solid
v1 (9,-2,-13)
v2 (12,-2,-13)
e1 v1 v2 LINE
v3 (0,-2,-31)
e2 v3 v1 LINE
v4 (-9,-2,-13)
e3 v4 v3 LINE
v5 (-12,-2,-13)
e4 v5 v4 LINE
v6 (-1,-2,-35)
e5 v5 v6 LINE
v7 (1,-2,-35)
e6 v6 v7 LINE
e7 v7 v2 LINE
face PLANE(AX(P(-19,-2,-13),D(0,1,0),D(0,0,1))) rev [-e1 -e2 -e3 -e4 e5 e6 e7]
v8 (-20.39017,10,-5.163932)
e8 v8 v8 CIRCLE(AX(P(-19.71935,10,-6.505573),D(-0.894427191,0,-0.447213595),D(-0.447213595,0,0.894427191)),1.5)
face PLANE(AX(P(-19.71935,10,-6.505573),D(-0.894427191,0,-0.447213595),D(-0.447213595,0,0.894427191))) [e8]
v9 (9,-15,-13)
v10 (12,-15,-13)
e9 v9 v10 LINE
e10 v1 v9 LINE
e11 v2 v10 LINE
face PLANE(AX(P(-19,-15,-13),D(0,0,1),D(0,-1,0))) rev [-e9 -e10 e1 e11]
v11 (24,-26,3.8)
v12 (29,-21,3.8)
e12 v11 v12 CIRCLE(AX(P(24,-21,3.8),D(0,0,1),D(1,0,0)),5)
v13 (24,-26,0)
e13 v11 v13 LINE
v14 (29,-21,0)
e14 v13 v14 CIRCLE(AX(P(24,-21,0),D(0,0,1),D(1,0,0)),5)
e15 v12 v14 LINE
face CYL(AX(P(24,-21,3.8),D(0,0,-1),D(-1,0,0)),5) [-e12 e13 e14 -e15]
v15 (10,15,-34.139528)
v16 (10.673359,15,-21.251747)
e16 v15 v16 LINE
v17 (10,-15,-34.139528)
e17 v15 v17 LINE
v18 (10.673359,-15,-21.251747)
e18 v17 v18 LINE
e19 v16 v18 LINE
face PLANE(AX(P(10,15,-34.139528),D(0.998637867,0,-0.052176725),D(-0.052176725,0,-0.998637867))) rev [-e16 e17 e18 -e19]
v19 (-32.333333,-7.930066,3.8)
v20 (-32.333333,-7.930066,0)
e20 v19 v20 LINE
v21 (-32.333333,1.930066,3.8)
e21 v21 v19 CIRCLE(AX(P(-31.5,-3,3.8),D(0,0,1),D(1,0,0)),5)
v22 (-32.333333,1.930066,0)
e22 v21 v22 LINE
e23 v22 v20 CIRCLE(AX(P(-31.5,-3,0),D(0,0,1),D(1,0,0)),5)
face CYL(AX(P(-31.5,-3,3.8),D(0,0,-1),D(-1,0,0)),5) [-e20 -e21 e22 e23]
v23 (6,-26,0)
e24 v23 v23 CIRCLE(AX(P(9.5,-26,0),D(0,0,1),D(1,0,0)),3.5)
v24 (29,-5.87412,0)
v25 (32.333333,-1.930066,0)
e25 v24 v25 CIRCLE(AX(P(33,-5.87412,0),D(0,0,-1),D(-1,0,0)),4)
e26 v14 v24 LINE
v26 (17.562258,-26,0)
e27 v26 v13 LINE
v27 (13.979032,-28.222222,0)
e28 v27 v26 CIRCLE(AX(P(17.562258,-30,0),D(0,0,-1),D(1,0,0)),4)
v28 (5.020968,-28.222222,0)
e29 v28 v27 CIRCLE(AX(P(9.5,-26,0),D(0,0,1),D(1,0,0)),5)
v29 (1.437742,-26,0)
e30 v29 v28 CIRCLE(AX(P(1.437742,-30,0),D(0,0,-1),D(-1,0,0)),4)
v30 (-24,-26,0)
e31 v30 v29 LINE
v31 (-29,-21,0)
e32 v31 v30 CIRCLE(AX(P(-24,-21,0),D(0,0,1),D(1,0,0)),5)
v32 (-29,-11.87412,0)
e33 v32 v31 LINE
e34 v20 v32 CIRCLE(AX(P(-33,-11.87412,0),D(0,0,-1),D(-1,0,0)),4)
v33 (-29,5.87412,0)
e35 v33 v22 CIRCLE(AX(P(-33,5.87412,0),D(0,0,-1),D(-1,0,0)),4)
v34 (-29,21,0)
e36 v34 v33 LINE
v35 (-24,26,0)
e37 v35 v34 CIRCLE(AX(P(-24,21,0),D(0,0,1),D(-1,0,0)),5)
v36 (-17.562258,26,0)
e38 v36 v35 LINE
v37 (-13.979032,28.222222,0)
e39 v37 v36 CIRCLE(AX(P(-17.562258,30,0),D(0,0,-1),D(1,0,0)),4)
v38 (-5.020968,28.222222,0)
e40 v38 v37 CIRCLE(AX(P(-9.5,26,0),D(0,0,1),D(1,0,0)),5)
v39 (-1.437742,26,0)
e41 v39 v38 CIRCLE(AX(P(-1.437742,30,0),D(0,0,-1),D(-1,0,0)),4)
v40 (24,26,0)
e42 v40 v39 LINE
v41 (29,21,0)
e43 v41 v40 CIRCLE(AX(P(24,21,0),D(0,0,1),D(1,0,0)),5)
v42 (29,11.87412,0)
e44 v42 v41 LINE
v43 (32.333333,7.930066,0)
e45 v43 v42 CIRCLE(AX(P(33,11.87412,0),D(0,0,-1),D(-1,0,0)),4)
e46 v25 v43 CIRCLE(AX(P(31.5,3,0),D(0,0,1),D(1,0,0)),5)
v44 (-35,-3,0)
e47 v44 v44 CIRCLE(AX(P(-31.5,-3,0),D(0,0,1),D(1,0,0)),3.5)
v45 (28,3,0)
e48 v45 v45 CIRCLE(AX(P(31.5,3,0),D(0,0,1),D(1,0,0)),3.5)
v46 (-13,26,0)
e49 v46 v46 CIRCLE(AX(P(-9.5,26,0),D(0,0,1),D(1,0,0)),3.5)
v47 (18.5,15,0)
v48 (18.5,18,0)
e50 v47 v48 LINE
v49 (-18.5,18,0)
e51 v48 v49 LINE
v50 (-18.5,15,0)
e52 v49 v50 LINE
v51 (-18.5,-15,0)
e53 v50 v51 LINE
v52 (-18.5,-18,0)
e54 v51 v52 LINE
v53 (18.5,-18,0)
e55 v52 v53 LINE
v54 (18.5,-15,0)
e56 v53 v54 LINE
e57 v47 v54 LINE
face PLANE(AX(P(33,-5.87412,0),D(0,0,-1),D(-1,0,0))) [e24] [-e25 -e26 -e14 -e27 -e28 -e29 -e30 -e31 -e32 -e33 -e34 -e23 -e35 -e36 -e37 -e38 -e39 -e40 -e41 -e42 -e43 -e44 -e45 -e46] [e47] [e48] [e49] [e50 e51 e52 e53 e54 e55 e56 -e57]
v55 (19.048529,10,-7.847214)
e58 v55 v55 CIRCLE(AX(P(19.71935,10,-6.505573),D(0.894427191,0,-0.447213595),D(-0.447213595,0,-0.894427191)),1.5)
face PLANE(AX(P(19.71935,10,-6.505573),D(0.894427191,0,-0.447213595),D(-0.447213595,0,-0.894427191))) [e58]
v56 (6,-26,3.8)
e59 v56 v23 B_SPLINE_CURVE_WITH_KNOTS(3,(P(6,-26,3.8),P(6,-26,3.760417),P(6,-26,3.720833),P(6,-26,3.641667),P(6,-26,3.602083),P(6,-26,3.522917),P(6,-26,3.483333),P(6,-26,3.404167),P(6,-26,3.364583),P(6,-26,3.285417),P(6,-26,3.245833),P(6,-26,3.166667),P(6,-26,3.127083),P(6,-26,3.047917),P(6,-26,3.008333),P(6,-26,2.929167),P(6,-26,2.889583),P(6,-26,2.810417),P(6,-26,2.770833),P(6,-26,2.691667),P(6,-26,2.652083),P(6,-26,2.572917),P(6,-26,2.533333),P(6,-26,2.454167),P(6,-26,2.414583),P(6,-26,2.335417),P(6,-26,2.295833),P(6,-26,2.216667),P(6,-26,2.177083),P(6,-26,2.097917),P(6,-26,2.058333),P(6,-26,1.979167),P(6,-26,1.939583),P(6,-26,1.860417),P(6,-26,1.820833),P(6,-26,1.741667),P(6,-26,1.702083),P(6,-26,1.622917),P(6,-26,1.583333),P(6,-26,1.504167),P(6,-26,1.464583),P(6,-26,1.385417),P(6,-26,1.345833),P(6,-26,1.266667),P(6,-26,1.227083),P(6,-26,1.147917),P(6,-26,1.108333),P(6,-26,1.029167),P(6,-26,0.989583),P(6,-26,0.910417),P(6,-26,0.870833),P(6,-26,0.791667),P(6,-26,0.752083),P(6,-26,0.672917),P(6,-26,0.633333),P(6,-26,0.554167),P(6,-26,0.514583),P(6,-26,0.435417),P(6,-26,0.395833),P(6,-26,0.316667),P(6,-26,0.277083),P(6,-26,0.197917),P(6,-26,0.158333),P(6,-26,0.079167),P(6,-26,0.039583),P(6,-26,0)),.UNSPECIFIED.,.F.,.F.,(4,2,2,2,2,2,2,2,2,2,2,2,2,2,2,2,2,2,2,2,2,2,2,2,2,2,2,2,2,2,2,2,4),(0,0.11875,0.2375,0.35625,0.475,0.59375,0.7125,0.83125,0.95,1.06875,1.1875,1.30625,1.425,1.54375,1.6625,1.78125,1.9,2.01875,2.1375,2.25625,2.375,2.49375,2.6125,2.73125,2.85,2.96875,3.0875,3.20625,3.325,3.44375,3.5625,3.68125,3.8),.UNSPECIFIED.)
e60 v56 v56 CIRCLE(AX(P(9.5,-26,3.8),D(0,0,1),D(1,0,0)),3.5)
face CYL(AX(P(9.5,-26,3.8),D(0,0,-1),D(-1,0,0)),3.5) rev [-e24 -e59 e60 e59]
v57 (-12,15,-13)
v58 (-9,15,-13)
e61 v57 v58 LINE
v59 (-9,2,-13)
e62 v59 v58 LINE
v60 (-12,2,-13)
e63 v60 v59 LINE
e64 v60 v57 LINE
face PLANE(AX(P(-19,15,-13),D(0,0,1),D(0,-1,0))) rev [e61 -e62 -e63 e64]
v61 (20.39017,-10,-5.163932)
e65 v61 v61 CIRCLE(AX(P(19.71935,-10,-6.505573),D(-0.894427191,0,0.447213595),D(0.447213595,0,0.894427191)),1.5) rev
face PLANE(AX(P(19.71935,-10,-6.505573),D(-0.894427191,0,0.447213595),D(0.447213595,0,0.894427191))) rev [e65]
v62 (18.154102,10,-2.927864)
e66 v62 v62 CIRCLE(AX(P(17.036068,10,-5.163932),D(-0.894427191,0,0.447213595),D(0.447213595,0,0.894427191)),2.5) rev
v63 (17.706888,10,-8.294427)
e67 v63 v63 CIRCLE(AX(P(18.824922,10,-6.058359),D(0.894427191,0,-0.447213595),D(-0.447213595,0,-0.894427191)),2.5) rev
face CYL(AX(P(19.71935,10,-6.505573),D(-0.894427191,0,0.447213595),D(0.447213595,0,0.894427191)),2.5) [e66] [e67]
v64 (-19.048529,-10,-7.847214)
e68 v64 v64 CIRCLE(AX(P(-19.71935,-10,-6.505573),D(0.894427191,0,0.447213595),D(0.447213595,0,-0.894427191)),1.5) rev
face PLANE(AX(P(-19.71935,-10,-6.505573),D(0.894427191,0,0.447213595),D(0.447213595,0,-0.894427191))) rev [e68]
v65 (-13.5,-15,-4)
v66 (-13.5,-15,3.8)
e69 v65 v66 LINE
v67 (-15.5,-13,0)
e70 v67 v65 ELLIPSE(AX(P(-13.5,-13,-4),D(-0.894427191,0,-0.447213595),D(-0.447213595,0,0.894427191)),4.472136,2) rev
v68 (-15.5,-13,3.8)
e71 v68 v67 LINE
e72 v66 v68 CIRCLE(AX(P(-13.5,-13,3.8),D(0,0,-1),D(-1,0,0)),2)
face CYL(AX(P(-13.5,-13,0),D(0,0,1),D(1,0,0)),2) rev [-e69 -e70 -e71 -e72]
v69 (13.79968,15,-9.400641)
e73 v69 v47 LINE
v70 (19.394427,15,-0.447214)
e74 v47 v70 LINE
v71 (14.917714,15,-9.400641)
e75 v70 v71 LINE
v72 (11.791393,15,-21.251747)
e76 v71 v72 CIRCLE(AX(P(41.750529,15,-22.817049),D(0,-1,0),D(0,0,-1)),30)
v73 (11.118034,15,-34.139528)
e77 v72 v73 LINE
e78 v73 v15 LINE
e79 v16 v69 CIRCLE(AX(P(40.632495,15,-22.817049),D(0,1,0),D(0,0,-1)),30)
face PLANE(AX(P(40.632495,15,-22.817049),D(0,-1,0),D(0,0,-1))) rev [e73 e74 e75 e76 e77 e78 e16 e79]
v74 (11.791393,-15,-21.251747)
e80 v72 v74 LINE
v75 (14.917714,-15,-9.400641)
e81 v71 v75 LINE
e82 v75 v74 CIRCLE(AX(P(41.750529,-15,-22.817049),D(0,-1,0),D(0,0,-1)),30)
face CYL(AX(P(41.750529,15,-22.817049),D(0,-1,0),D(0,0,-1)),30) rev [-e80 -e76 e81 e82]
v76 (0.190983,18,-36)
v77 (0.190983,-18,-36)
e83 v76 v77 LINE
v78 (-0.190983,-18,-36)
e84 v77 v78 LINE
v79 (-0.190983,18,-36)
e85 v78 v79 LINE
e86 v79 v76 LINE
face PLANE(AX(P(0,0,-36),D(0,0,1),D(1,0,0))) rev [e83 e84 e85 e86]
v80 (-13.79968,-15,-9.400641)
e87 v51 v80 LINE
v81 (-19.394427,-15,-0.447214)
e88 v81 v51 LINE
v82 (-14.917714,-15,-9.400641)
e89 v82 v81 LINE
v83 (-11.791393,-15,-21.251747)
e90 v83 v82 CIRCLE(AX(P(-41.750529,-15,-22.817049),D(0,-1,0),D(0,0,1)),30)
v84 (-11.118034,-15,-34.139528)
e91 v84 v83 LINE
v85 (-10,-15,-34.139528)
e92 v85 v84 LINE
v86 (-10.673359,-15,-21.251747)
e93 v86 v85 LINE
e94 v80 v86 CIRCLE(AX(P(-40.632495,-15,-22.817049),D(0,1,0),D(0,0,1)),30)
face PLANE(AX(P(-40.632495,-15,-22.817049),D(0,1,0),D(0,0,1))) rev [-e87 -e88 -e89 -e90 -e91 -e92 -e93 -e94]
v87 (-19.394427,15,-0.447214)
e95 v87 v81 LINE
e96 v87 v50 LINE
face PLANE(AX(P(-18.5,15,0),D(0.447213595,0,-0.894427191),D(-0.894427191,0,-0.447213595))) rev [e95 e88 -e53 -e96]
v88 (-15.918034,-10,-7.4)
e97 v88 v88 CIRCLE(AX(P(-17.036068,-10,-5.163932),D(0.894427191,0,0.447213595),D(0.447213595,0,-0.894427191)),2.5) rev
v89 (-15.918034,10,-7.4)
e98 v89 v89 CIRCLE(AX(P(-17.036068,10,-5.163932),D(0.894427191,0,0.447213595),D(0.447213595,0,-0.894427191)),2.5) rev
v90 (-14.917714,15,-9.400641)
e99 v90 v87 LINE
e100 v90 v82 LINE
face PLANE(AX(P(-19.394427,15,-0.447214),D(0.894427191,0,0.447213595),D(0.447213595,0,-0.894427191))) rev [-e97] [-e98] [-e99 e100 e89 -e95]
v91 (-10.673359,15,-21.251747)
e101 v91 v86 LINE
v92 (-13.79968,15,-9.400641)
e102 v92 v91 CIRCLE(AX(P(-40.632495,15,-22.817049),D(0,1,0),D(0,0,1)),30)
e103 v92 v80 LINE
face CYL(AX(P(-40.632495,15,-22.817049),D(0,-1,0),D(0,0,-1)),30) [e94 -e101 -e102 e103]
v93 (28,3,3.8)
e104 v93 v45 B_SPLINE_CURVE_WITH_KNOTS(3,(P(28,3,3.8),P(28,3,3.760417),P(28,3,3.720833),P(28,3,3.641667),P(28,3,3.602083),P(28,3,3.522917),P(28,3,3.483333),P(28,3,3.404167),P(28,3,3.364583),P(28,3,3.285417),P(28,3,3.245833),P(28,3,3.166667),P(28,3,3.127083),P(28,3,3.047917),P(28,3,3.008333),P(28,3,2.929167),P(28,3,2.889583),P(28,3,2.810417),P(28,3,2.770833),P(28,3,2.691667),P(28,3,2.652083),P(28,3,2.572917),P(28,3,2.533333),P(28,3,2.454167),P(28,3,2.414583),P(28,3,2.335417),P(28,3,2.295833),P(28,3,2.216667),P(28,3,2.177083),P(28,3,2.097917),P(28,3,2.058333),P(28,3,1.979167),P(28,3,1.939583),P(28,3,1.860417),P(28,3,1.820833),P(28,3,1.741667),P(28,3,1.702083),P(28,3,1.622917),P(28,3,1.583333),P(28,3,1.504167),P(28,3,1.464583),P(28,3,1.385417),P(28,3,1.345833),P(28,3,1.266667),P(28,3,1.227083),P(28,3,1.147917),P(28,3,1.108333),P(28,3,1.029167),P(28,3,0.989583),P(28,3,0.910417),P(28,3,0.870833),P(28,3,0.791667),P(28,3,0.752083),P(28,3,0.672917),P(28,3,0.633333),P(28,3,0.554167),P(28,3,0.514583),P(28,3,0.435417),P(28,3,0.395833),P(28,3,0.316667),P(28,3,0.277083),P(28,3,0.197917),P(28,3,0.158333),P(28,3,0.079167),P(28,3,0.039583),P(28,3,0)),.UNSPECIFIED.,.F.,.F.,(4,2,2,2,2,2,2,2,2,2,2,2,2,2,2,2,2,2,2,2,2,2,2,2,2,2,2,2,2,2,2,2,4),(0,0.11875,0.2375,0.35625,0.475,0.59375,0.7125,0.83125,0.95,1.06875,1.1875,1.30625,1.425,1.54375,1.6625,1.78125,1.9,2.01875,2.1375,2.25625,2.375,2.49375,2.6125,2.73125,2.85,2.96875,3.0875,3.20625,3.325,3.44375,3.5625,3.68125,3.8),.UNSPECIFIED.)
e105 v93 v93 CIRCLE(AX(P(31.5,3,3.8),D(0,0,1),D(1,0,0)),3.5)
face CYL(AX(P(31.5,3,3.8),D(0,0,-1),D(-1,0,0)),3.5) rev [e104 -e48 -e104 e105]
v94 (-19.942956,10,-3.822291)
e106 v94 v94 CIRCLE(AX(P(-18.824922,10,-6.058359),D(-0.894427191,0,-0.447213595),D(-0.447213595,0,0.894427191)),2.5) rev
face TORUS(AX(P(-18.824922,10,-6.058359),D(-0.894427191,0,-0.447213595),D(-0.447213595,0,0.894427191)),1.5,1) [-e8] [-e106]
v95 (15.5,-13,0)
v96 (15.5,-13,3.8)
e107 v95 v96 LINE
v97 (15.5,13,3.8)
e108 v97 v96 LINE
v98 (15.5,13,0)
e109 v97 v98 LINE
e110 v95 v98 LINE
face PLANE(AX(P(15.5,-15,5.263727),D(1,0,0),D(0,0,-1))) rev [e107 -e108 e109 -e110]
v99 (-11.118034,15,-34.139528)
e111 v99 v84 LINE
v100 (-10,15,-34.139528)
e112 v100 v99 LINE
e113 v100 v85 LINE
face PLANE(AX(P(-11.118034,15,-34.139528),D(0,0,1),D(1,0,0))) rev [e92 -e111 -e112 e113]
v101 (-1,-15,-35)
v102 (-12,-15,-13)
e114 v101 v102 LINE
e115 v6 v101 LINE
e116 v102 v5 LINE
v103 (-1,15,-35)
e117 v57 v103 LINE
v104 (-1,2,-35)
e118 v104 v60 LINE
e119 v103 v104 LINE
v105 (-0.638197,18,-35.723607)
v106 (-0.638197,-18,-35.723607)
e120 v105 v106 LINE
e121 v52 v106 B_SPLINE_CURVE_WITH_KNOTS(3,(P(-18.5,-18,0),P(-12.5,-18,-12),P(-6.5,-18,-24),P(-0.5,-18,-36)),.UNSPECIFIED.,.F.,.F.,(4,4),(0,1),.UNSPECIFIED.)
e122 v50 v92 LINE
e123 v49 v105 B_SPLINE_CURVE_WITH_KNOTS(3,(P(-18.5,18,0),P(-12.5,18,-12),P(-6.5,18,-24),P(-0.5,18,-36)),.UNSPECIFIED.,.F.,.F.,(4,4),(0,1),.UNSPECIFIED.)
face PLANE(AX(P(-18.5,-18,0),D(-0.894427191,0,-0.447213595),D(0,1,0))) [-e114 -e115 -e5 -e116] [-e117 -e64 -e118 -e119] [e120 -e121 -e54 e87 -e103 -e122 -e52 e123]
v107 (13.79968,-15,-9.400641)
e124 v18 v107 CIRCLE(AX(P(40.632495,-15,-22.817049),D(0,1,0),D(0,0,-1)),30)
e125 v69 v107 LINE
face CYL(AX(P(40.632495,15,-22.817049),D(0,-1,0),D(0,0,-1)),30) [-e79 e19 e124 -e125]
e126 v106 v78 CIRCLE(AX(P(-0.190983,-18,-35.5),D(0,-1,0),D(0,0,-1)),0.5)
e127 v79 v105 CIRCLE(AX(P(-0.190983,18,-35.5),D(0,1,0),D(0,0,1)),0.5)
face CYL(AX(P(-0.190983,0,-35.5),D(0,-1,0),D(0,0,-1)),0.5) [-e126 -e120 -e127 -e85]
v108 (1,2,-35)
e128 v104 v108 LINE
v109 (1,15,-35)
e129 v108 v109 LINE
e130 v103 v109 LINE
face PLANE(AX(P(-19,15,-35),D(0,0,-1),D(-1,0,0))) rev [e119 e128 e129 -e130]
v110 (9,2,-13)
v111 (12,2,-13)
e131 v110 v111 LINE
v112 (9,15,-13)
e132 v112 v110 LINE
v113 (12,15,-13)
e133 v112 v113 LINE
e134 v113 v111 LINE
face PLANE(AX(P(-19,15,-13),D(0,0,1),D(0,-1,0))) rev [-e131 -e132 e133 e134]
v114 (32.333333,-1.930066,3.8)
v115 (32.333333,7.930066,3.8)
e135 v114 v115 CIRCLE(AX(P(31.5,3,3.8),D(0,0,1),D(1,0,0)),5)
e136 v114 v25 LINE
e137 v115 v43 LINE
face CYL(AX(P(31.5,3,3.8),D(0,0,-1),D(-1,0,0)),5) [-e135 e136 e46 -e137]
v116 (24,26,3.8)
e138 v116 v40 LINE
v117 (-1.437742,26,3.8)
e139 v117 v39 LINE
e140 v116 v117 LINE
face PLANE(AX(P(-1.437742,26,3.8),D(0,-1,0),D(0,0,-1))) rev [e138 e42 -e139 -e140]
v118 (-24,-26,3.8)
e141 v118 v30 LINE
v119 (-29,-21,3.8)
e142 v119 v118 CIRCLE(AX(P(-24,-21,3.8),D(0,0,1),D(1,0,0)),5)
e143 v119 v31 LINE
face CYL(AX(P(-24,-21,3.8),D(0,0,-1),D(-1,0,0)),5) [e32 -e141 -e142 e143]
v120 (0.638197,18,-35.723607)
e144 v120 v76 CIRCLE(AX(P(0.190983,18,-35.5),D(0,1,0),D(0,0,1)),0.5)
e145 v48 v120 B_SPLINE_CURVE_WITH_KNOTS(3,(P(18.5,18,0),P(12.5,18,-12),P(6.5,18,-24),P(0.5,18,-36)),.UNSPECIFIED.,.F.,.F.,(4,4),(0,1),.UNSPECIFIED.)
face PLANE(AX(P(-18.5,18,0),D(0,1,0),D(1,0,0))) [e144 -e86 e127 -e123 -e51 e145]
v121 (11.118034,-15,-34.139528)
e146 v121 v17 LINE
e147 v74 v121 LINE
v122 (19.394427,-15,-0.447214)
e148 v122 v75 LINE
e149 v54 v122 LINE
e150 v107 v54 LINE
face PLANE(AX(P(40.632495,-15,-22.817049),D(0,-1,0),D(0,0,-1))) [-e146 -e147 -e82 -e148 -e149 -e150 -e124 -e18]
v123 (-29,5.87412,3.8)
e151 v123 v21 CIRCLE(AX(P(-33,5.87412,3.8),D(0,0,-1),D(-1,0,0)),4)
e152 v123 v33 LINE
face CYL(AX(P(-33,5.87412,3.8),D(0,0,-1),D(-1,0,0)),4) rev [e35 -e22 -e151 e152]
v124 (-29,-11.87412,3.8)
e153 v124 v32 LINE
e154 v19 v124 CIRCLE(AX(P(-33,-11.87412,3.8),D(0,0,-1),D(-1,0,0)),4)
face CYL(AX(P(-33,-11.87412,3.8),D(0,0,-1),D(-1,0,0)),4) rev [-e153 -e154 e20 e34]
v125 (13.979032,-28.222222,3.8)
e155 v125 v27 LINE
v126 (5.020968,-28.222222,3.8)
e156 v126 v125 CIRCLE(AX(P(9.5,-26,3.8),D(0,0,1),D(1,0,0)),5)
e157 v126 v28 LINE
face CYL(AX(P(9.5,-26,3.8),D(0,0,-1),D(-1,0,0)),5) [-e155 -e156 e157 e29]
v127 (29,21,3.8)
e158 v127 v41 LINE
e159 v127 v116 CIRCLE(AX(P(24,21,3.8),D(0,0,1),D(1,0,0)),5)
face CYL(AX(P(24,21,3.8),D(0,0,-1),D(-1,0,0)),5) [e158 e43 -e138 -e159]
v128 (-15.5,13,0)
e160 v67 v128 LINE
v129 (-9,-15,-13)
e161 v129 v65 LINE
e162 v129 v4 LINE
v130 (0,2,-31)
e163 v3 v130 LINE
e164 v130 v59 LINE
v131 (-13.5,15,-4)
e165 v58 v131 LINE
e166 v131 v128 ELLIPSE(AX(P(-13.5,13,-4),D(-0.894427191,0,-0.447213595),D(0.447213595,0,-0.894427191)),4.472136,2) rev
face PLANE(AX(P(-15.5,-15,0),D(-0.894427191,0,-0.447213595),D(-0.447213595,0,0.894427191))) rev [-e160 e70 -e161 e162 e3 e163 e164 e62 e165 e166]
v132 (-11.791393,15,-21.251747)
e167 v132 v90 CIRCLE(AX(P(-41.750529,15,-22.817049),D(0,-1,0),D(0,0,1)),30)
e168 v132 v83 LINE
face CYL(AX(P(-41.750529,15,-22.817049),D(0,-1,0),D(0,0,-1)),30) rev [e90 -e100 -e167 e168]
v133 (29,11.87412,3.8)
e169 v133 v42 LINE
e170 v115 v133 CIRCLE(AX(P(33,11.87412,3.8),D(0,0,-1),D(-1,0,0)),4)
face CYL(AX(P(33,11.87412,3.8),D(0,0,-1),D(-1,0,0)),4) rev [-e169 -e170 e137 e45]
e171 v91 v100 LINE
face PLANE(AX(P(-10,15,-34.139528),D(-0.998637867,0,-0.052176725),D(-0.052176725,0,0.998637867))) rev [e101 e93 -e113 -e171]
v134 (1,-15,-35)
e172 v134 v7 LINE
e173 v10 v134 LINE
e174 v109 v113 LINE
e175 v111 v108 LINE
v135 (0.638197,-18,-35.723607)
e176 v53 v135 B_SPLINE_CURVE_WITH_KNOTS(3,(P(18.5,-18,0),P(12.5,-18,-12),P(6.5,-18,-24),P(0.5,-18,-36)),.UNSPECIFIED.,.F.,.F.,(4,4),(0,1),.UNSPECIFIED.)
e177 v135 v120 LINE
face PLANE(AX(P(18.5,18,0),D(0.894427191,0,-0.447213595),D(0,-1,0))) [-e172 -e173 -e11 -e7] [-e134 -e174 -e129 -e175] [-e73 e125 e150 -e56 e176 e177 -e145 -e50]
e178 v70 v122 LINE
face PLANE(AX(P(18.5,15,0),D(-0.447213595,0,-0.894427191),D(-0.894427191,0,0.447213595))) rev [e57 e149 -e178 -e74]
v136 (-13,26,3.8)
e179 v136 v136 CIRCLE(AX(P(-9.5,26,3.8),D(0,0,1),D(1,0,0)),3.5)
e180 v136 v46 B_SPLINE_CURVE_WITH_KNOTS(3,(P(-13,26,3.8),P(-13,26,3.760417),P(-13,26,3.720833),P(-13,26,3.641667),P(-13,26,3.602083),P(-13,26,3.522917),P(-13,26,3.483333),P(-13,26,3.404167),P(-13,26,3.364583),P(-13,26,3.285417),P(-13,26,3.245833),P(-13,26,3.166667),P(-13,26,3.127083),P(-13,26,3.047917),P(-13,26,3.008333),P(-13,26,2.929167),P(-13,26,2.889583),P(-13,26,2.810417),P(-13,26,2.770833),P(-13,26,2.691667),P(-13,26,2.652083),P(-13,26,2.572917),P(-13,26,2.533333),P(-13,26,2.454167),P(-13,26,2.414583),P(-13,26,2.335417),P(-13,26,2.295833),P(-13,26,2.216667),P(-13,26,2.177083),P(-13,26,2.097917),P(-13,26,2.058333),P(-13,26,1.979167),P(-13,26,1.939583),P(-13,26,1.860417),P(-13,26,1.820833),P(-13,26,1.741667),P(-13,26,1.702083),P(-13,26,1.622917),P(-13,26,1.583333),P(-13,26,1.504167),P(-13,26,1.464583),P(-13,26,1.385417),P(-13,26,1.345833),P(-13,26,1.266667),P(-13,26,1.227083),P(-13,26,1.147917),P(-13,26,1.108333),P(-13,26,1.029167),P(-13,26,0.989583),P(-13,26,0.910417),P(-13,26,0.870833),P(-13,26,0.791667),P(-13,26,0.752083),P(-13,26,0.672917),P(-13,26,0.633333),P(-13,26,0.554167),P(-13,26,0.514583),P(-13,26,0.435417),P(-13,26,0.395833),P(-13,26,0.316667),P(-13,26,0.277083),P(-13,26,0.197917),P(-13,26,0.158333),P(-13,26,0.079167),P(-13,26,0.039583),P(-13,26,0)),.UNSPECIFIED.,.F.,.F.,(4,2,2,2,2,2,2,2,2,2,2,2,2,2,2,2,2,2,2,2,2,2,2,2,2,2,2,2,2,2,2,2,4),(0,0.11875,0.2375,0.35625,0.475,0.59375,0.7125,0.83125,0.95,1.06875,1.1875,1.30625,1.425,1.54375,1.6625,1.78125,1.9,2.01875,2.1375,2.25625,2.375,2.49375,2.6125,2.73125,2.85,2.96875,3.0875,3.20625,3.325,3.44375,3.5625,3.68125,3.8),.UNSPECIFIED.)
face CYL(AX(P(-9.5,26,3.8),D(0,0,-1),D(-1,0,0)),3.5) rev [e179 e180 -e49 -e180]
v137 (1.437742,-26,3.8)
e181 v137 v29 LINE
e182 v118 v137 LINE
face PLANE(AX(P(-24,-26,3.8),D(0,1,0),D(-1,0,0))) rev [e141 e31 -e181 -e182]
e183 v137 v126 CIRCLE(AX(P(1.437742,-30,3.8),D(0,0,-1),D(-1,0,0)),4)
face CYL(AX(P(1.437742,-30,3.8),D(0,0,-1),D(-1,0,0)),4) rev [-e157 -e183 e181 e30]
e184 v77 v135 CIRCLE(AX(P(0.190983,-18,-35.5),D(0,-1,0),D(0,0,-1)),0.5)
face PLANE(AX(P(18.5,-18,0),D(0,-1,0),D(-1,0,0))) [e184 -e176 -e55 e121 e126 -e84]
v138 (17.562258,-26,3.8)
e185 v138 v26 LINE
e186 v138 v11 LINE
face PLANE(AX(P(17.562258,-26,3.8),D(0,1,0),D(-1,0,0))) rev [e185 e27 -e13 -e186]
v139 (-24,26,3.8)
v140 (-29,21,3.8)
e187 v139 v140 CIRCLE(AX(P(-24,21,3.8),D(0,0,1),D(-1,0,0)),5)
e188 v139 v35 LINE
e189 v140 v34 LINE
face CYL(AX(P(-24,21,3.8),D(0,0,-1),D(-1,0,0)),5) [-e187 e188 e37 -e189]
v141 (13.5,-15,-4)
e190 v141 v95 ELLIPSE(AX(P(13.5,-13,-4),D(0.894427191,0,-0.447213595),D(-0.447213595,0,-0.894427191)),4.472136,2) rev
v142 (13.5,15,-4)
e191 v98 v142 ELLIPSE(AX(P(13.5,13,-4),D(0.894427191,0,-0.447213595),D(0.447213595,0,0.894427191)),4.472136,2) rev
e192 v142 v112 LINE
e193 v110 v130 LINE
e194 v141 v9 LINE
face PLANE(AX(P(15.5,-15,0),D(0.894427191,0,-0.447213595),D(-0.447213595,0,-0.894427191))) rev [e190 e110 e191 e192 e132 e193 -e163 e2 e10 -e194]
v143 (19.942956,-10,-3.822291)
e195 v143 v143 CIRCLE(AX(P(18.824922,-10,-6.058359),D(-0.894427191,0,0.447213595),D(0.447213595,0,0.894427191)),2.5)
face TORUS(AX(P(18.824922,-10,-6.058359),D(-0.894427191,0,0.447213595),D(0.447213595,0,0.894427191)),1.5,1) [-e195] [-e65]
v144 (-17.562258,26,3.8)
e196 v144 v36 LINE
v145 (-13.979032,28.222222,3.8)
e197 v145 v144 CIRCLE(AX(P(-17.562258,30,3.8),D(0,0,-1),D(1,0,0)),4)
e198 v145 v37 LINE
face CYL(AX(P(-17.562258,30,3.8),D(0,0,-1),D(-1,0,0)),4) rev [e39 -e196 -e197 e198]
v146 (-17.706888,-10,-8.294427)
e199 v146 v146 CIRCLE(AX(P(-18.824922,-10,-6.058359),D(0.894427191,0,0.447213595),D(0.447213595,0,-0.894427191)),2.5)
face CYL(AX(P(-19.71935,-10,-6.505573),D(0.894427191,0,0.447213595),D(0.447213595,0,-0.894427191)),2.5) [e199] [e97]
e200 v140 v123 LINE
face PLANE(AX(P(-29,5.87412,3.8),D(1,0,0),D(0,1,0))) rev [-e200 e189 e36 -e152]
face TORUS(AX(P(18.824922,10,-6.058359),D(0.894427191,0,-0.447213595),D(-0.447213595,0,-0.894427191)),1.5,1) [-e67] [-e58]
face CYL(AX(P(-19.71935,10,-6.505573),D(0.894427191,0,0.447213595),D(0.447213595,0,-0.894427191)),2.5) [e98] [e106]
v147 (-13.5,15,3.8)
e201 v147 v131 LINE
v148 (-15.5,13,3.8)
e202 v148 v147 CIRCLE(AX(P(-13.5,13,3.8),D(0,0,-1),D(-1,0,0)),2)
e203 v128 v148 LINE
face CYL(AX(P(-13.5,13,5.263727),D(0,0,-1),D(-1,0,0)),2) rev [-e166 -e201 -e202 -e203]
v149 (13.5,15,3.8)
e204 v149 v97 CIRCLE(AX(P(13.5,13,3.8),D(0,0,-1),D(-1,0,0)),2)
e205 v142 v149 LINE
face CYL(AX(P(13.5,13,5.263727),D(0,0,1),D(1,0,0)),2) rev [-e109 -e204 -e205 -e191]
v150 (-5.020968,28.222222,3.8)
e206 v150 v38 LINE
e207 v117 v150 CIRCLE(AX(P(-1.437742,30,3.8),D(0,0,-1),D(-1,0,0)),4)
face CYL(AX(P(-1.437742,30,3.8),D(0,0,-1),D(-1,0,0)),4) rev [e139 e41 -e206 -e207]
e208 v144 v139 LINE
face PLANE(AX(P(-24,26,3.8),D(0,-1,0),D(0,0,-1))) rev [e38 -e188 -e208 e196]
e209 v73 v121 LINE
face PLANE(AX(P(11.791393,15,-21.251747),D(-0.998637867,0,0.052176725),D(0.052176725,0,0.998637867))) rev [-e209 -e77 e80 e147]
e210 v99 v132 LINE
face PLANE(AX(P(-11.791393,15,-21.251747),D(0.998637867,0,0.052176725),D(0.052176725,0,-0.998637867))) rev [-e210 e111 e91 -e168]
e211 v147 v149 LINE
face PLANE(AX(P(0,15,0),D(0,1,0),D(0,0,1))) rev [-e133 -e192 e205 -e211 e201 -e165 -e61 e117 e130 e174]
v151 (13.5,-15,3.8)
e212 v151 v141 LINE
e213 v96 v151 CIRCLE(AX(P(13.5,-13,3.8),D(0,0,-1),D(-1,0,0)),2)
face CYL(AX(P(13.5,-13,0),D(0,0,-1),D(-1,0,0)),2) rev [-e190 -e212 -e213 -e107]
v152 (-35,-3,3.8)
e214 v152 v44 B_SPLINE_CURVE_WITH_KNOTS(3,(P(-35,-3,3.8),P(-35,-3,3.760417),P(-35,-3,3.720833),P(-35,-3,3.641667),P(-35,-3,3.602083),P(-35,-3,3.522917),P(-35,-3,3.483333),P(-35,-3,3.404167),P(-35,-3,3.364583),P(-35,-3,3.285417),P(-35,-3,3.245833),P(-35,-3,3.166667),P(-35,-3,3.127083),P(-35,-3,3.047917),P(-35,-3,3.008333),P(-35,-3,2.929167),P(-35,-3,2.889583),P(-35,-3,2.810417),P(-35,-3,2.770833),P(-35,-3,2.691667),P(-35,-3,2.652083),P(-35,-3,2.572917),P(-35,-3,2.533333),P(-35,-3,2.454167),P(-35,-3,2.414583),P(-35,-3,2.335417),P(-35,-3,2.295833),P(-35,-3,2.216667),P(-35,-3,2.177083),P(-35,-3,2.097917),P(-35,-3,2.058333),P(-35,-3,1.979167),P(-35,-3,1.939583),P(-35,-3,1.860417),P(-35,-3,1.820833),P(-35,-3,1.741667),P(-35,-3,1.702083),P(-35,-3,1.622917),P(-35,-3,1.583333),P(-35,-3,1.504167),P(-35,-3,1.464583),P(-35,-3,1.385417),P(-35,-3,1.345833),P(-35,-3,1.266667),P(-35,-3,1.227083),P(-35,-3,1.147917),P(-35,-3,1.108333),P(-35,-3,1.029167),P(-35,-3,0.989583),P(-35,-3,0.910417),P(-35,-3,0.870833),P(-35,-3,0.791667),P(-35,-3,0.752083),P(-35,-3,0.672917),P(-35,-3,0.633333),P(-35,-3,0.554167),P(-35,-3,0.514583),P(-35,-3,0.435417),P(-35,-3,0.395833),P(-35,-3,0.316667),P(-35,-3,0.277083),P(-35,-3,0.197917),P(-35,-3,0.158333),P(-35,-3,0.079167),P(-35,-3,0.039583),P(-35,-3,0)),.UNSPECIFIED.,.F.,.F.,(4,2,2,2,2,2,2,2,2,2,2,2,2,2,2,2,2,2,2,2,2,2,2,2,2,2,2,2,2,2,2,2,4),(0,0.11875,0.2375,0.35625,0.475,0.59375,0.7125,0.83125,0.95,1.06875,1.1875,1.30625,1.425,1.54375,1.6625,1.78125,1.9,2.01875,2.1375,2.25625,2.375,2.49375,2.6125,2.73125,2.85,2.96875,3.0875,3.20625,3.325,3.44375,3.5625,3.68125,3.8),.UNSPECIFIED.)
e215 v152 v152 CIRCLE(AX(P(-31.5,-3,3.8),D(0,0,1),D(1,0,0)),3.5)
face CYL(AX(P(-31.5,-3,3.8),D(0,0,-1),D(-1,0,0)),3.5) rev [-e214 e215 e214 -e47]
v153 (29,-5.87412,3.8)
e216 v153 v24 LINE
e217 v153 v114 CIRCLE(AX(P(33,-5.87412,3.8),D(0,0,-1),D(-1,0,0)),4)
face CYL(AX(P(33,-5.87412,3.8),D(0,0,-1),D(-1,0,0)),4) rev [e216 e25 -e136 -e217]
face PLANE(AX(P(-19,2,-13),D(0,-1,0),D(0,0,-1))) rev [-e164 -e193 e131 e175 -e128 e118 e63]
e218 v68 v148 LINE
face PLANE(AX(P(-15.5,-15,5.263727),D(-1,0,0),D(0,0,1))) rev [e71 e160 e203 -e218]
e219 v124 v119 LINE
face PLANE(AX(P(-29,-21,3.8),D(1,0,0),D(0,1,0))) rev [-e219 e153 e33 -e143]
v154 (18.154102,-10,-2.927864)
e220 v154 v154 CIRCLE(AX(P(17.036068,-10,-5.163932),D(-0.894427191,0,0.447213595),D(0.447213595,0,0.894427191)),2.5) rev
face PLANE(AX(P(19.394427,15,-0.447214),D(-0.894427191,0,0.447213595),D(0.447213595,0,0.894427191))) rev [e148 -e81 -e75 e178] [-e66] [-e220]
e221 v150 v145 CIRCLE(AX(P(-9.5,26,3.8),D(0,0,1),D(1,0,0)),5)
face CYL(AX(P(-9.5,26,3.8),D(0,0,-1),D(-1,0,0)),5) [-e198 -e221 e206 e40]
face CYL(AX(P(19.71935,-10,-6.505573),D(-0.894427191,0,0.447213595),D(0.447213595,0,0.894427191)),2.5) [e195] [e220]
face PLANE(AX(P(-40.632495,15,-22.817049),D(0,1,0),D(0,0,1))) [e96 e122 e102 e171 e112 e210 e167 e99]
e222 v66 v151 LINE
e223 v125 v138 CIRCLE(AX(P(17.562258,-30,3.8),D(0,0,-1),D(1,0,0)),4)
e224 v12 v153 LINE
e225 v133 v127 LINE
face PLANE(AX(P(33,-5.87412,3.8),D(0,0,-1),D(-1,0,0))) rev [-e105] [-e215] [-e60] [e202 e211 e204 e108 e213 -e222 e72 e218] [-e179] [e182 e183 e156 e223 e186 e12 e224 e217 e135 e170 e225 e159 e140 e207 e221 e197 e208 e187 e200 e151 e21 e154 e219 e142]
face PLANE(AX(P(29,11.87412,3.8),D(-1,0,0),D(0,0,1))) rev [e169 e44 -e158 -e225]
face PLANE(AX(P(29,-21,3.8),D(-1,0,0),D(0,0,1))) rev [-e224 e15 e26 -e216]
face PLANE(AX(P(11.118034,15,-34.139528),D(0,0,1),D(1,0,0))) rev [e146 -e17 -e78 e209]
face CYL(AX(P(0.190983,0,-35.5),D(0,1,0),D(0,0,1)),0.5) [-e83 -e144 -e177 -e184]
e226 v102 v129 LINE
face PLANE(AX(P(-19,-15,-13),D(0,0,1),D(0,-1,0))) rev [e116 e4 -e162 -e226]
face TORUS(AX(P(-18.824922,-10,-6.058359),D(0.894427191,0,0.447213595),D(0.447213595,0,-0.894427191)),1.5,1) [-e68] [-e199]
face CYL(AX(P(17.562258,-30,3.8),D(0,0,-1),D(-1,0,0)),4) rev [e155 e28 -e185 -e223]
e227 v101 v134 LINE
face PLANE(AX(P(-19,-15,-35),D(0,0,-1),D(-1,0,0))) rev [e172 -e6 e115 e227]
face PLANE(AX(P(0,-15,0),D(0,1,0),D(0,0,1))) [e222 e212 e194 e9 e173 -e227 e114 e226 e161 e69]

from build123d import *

# Parameters (mm, degrees)
SKETCH_1_R          = 3.5
EXTRUDE_1_DEPTH     = 3.8
LOFT_START          = -18
LOFT_1_DEPTH        = 36
FILLET_1_R          = 0.5
CUT_EXTRUDE_1_DEPTH = 15
FILLET_2_R          = 2
SKETCH_6_W          = 22
SKETCH_6_H          = 13
CUT_EXTRUDE_2_DEPTH = 19
EXTRUDE_2_DEPTH     = 15
SKETCH_8_R          = 2.5
EXTRUDE_3_DEPTH     = 3
FILLET_5_R          = 1
SKETCH_9_R          = 2.5
EXTRUDE_4_DEPTH     = 3
FILLET_6_R          = 1


# Read off the part's stored shape, not the designer's step: По сечениям1
with BuildPart() as part:
    # Эскиз1 → Бобышка-Вытянуть1 (new body)
    with BuildSketch(Plane.XY):
        with BuildLine():
            Line((-24, -26), (1.437742252, -26))
            ThreePointArc((1.437742252, -26), (3.545927358, -26.600653658), (5.020967918, -28.222222222))
            ThreePointArc((5.020967918, -28.222222222), (9.5, -31), (13.979032082, -28.222222222))
            ThreePointArc((13.979032082, -28.222222222), (15.454072642, -26.600653658), (17.562257748, -26))
            Line((17.562257748, -26), (24, -26))
            ThreePointArc((24, -26), (27.535533906, -24.535533906), (29, -21))
            Line((29, -21), (29, -5.874119675))
            ThreePointArc((29, -5.874119675), (29.944949537, -3.292130777), (32.333333333, -1.930066486))
            ThreePointArc((32.333333333, -1.930066486), (36.5, 3), (32.333333333, 7.930066486))
            ThreePointArc((32.333333333, 7.930066486), (29.944949537, 9.292130777), (29, 11.874119675))
            Line((29, 11.874119675), (29, 21))
            ThreePointArc((29, 21), (27.535533906, 24.535533906), (24, 26))
            Line((24, 26), (-1.437742252, 26))
            ThreePointArc((-1.437742252, 26), (-3.545927358, 26.600653658), (-5.020967918, 28.222222222))
            ThreePointArc((-5.020967918, 28.222222222), (-9.5, 31), (-13.979032082, 28.222222222))
            ThreePointArc((-13.979032082, 28.222222222), (-15.454072642, 26.600653658), (-17.562257748, 26))
            Line((-17.562257748, 26), (-24, 26))
            ThreePointArc((-24, 26), (-27.535533906, 24.535533906), (-29, 21))
            Line((-29, 21), (-29, 5.874119675))
            ThreePointArc((-29, 5.874119675), (-29.944949537, 3.292130777), (-32.333333333, 1.930066486))
            ThreePointArc((-32.333333333, 1.930066486), (-36.5, -3), (-32.333333333, -7.930066486))
            ThreePointArc((-32.333333333, -7.930066486), (-29.944949537, -9.292130777), (-29, -11.874119675))
            Line((-29, -11.874119675), (-29, -21))
            ThreePointArc((-29, -21), (-27.535533906, -24.535533906), (-24, -26))
        make_face()
        with Locations(Location((31.5, 3, 0), (0, 0, 180))):
            Circle(SKETCH_1_R, mode=Mode.SUBTRACT)
        with Locations(Location((-9.5, 26, 0), (0, 0, 180))):
            Circle(SKETCH_1_R, mode=Mode.SUBTRACT)
        with Locations(Location((-31.5, -3, 0), (0, 0, 180))):
            Circle(SKETCH_1_R, mode=Mode.SUBTRACT)
        with Locations(Location((9.5, -26, 0), (0, 0, 180))):
            Circle(SKETCH_1_R, mode=Mode.SUBTRACT)
    extrude(amount=EXTRUDE_1_DEPTH)

    # По сечениям1 outline → По сечениям1 (add)
    with BuildSketch(Plane(origin=(0, 0, 0), x_dir=(1, 0, 0), z_dir=(0, 1, 0)).offset(LOFT_START)):
        Polygon((0.5, 36), (-0.5, 36), (-18.5, 0), (18.5, 0), align=None)
    extrude(amount=LOFT_1_DEPTH)

    # Скругление1
    fillet_1_edges = [part.edges().sort_by_distance(p)[0] for p in [
        (0.5, 0, -36),
        (-0.5, 0, -36),
    ]]
    fillet(fillet_1_edges, radius=FILLET_1_R)

    # Эскиз5 → Вырез-Вытянуть1 (cut, symmetric)
    with BuildSketch(Plane(origin=(0, 0, 0), x_dir=(1, 0, 0), z_dir=(0, 1, 0))):
        Polygon((15.5, -5.263726507), (-15.5, -5.263726507), (-15.5, 0), (0, 31), (15.5, 0), align=None)
    extrude(amount=CUT_EXTRUDE_1_DEPTH, both=True, mode=Mode.SUBTRACT)

    # Скругление2
    fillet_2_edges = [part.edges().sort_by_distance(p)[0] for p in [
        (15.5, -15, 1.9),
        (-15.5, -15, 1.9),
        (-15.5, 15, 1.9),
        (15.5, 15, 1.9),
    ]]
    fillet(fillet_2_edges, radius=FILLET_2_R)

    # Эскиз6 → Вырез-Вытянуть2 (cut, symmetric)
    with BuildSketch(Plane(origin=(0, 0, 0), x_dir=(0, 0, -1), z_dir=(1, 0, 0))):
        with Locations((24, 8.5)):
            Rectangle(SKETCH_6_W, SKETCH_6_H)
        with Locations((24, -8.5)):
            Rectangle(SKETCH_6_W, SKETCH_6_H)
    extrude(amount=CUT_EXTRUDE_2_DEPTH, both=True, mode=Mode.SUBTRACT)

    # Эскиз7 → Бобышка-Вытянуть2 (add, symmetric)
    with BuildSketch(Plane(origin=(0, 0, 0), x_dir=(1, 0, 0), z_dir=(0, 1, 0))):
        with BuildLine():
            Line((10, 34.139527531), (10.6733594, 21.251746752))
            ThreePointArc((10.6733594, 21.251746752), (11.624847718, 15.164834748), (13.799679679, 9.400640641))
            Line((13.799679679, 9.400640641), (18.5, 0))
            Line((18.5, 0), (19.394427191, 0.447213595))
            Line((19.394427191, 0.447213595), (14.917713668, 9.400640641))
            ThreePointArc((14.917713668, 9.400640641), (12.742881707, 15.164834748), (11.791393389, 21.251746752))
            Line((11.791393389, 21.251746752), (11.118033989, 34.139527531))
            Line((11.118033989, 34.139527531), (10, 34.139527531))
        make_face()
        with BuildLine():
            Line((-18.5, 0), (-19.394427191, 0.447213595))
            Line((-19.394427191, 0.447213595), (-14.917713668, 9.400640641))
            ThreePointArc((-14.917713668, 9.400640641), (-12.742881707, 15.164834748), (-11.791393389, 21.251746752))
            Line((-11.791393389, 21.251746752), (-11.118033989, 34.139527531))
            Line((-11.118033989, 34.139527531), (-10, 34.139527531))
            Line((-10, 34.139527531), (-10.6733594, 21.251746752))
            ThreePointArc((-10.6733594, 21.251746752), (-11.624847718, 15.164834748), (-13.799679679, 9.400640641))
            Line((-13.799679679, 9.400640641), (-18.5, 0))
        make_face()
    extrude(amount=EXTRUDE_2_DEPTH, both=True)

    # Эскиз8 → Бобышка-Вытянуть3 (add)
    with BuildSketch(Plane(origin=(15.694427191, 0, -7.847213595), x_dir=(-0.4472135954999576, 0, -0.8944271909999162), z_dir=(0.8944271909999162, 0, -0.4472135954999576))):
        with Locations(Location((-3, 10, 0), (0, 0, 180))):
            Circle(SKETCH_8_R)
        with Locations(Location((-3, -10, 0), (0, 0, 180))):
            Circle(SKETCH_8_R)
    extrude(amount=EXTRUDE_3_DEPTH)

    # Скругление5
    fillet_5_edges = [part.edges().sort_by_distance(p)[0] for p in [
        (18.601315562, 10, -8.741640786),
        (18.601315562, -10, -8.741640786),
    ]]
    fillet(fillet_5_edges, radius=FILLET_5_R)

    # Эскиз9 → Бобышка-Вытянуть4 (add)
    with BuildSketch(Plane(origin=(-15.694427191, 0, -7.847213595), x_dir=(-0.4472135954999576, 0, 0.8944271909999162), z_dir=(-0.8944271909999162, 0, -0.4472135954999576))):
        with Locations(Location((3, 10, 0), (0, 0, 180))):
            Circle(SKETCH_9_R)
        with Locations(Location((3, -10, 0), (0, 0, 180))):
            Circle(SKETCH_9_R)
    extrude(amount=EXTRUDE_4_DEPTH)

    # Скругление6
    fillet_6_edges = [part.edges().sort_by_distance(p)[0] for p in [
        (-20.837383539, 10, -4.269504832),
        (-20.837383539, -10, -4.269504832),
    ]]
    fillet(fillet_6_edges, radius=FILLET_6_R)


solid = part.part
